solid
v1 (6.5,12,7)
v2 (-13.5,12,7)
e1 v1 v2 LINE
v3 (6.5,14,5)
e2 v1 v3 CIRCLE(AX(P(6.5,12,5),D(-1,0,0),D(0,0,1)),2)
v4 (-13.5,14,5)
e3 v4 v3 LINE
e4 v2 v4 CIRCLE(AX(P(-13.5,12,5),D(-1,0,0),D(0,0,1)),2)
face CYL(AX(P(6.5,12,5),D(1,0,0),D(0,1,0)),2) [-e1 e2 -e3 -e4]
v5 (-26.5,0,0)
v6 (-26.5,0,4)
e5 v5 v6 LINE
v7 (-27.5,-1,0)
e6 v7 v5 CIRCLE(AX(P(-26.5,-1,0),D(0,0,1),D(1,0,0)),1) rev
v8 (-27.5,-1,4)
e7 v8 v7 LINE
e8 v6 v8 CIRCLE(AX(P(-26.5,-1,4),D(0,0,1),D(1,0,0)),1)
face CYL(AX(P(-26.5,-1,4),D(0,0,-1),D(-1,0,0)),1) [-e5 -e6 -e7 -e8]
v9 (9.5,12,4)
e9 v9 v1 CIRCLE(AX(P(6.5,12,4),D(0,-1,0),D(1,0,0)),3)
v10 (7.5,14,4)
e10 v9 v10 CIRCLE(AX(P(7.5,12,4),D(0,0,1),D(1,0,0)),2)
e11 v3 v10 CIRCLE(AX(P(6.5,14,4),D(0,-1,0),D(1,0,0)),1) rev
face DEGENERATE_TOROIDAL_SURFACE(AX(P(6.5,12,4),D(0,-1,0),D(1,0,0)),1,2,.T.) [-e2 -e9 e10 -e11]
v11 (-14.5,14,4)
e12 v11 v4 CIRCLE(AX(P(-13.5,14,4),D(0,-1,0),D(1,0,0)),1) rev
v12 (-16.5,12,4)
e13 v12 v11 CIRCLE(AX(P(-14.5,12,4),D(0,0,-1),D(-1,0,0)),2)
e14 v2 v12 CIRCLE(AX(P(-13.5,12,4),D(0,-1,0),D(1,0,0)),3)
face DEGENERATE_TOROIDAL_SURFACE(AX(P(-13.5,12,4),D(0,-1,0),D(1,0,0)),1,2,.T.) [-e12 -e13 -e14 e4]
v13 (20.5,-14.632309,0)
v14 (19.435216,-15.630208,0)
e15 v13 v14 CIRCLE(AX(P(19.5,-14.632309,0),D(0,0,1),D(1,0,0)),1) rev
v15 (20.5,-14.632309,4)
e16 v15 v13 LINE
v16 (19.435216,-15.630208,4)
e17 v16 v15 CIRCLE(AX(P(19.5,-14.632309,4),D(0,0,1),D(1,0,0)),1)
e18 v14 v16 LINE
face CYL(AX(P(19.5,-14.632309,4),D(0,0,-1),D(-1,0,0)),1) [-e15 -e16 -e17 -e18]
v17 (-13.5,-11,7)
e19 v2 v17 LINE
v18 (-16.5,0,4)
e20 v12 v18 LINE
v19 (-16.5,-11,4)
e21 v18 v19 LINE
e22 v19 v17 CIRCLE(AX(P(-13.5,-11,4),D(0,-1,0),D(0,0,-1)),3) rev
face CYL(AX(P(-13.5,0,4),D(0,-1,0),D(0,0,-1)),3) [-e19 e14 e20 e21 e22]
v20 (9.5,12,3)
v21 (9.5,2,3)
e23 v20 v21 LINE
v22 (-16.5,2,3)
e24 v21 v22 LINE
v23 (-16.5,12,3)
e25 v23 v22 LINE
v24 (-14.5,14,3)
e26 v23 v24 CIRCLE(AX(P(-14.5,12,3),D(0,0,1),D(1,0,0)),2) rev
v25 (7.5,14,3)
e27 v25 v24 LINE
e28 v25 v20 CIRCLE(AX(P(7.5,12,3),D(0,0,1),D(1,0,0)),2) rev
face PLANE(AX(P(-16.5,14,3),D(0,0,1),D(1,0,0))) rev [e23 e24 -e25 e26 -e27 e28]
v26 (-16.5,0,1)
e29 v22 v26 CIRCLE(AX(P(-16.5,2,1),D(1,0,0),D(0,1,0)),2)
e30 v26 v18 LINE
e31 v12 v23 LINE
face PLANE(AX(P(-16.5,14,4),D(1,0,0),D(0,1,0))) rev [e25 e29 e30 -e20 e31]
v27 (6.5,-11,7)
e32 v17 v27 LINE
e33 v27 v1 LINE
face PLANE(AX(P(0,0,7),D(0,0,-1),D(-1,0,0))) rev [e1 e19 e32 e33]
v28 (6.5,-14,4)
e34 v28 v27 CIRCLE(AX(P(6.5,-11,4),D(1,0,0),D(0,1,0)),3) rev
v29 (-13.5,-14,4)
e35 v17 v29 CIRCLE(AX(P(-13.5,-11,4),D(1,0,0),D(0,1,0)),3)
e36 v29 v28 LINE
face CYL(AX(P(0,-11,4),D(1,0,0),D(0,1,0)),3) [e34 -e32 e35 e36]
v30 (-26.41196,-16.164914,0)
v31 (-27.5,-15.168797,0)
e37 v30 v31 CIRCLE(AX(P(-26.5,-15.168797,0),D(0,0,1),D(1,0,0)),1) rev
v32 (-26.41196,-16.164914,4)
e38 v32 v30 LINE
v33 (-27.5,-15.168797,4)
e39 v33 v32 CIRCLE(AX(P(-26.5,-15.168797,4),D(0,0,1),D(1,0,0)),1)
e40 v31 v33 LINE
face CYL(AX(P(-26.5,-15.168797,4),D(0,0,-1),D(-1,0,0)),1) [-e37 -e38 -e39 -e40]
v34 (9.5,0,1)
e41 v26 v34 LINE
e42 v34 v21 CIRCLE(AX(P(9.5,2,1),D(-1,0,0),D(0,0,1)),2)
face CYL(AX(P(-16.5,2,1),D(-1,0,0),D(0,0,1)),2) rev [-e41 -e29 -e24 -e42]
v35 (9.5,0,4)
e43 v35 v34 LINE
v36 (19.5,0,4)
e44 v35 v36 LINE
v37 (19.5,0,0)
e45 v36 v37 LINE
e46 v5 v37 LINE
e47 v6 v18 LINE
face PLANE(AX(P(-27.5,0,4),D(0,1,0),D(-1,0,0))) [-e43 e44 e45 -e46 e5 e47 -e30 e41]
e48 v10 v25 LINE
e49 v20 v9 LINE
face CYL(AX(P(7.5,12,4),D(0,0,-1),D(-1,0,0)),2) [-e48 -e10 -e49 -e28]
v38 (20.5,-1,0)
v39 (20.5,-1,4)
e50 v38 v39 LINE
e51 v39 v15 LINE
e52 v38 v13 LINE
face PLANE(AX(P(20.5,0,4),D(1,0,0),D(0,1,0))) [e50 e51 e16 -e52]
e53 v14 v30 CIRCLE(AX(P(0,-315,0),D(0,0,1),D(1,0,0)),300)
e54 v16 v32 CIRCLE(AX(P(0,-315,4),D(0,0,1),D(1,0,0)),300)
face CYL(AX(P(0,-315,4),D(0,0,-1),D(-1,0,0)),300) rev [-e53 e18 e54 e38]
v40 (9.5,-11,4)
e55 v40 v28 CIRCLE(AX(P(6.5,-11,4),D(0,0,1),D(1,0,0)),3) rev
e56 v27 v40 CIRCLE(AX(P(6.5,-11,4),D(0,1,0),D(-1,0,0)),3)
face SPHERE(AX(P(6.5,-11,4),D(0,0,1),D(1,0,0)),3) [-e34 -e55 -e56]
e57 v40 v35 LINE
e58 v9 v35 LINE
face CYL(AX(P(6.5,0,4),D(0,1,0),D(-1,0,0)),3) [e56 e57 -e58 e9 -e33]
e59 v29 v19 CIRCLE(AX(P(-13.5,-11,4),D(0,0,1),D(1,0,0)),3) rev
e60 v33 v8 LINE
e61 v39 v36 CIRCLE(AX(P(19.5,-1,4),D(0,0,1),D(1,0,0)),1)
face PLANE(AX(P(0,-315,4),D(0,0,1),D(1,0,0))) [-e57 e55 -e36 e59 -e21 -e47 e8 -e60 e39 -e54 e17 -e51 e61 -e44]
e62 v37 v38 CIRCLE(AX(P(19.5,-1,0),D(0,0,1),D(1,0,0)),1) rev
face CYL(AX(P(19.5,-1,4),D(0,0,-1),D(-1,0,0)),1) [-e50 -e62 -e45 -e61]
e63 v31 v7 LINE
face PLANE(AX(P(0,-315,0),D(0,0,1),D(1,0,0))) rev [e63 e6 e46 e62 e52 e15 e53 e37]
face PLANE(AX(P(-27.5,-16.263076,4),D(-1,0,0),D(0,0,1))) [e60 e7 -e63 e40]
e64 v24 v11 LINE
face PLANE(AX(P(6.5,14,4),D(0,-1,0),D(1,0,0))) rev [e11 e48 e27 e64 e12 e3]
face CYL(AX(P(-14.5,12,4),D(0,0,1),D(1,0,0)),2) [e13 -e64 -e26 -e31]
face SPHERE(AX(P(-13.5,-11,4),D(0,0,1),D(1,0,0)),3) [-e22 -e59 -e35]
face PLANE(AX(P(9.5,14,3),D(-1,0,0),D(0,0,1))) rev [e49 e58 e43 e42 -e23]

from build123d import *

# Parameters (mm, degrees)
BOSS_EXTRUDE1_DEPTH = 4
SKETCH4_W           = 26
SKETCH4_H           = 14
BOSS_EXTRUDE2_DEPTH = 3
FILLET1_R           = 1
FILLET3_R           = 3
FILLET4_R           = 3
BOSS_EXTRUDE9_DEPTH = 14
FILLET5_R           = 2
FILLET6_R           = 2


# Some blends are built 0.0001 mm under size
with BuildPart() as part:
    # Sketch1 → Boss-Extrude1 (new body)
    with BuildSketch(Plane(origin=(0, 0, 0), x_dir=(-1, 0, 0), z_dir=(0, 0, -1))):
        with BuildLine():
            Line((27.500000074, -16.263075607), (27.500000074, 0))
            Line((27.500000074, 0), (-20.499999926, 0))
            Line((-20.499999926, 0), (-20.499999926, -15.701236215))
            ThreePointArc((-20.499999926, -15.701236215), (3.511255672, -15.020548898), (27.500000074, -16.263075607))
        make_face()
    extrude(amount=-BOSS_EXTRUDE1_DEPTH)

    # Sketch4 → Boss-Extrude2 (add)
    with BuildSketch(Plane.XY.offset(4)):
        with Locations((-3.500000074, -7)):
            Rectangle(SKETCH4_W, SKETCH4_H)
    extrude(amount=BOSS_EXTRUDE2_DEPTH)

    # Fillet1
    fillet1_edges = [part.edges().sort_by_distance(p)[0] for p in [
        (20.499999926, 0, 2),
        (-27.500000074, 0, 2),
        (20.499999926, -15.701236215, 2),
        (-27.500000074, -16.263075607, 2),
    ]]
    fillet(fillet1_edges, radius=FILLET1_R)

    # Fillet3
    fillet3_edges = [part.edges().sort_by_distance(p)[0] for p in [
        (-3.500000074, -14, 7),
        (-16.500000074, -7, 7),
        (9.499999926, -7, 7),
    ]]
    fillet(fillet3_edges, radius=FILLET3_R - 0.0001)  # a hair under: the kernel refuses the full size

    # Fillet4
    # the kernel refuses this fillet: 3 mm, written as the material it takes off along each edge
    with BuildSketch(Plane(origin=(-13.500000074, -11, 7), x_dir=(-1, 0, 0), z_dir=(0, 1, 0))) as fillet4_piece_1:
        with BuildLine():
            CenterArc((0.0001, -2.9999), 2.9999, 0, 90)
            Line((3, -2.9999), (3, 0))
            Line((3, 0), (0.0001, 0))
        make_face()
    revolve(axis=Axis((-13.500000074, -11, 7), (0, 0, 1)), revolution_arc=90, mode=Mode.SUBTRACT)
    with BuildSketch(Plane(origin=(6.499999926, -11, 7), x_dir=(0, -1, 0), z_dir=(-1, 0, 0))) as fillet4_piece_2:
        with BuildLine():
            CenterArc((0.0001, -2.9999), 2.9999, 0, 90)
            Line((3, -2.9999), (3, 0))
            Line((3, 0), (0.0001, 0))
        make_face()
    revolve(axis=Axis((6.499999926, -11, 7), (0, 0, 1)), revolution_arc=90, mode=Mode.SUBTRACT)
    with BuildSketch(Plane(origin=(9.499999926, -14, 4), x_dir=(0, 1, 0), z_dir=(0, 0, 1))) as fillet4_piece_3:
        with BuildLine():
            CenterArc((FILLET4_R, FILLET4_R), FILLET4_R, 180, 90)
            Line((0, FILLET4_R), (0, 0))
            Line((0, 0), (FILLET4_R, 0))
        make_face()
    extrude(amount=3, mode=Mode.SUBTRACT)
    with BuildSketch(Plane(origin=(-16.500000074, -14, 4), x_dir=(0, 1, 0), z_dir=(0, 0, 1))) as fillet4_piece_4:
        with BuildLine():
            CenterArc((FILLET4_R, -FILLET4_R), FILLET4_R, 90, 90)
            Line((0, -FILLET4_R), (0, 0))
            Line((0, 0), (FILLET4_R, 0))
        make_face()
    extrude(amount=3, mode=Mode.SUBTRACT)

    # Sketch21 → Boss-Extrude9 (add)
    with BuildSketch(Plane(origin=(0, 0, 0), x_dir=(1, 0, 0), z_dir=(0, 1, 0))):
        with BuildLine():
            Line((6.499999926, -7), (-13.500000074, -7))
            ThreePointArc((-13.500000074, -7), (-15.621320417, -6.121320344), (-16.500000074, -4))
            Line((-16.500000074, -4), (-16.500000074, -3))
            Line((-16.500000074, -3), (9.499999926, -3))
            Line((9.499999926, -3), (9.499999926, -4))
            ThreePointArc((9.499999926, -4), (8.62132027, -6.121320344), (6.499999926, -7))
        make_face()
    extrude(amount=BOSS_EXTRUDE9_DEPTH)

    # Fillet5
    fillet5_edges = [part.edges().sort_by_distance(p)[0] for p in [
        (-16.500000074, 14, 3.5),
        (-15.621320417, 14, 6.121320344),
        (9.499999926, 14, 3.5),
        (8.62132027, 14, 6.121320344),
        (-3.500000074, 14, 7),
    ]]
    fillet(fillet5_edges, radius=FILLET5_R)

    # Fillet6
    fillet6_edges = [part.edges().sort_by_distance(p)[0] for p in [
        (-3.500000074, 0, 3),
    ]]
    fillet(fillet6_edges, radius=FILLET6_R)


solid = part.part
